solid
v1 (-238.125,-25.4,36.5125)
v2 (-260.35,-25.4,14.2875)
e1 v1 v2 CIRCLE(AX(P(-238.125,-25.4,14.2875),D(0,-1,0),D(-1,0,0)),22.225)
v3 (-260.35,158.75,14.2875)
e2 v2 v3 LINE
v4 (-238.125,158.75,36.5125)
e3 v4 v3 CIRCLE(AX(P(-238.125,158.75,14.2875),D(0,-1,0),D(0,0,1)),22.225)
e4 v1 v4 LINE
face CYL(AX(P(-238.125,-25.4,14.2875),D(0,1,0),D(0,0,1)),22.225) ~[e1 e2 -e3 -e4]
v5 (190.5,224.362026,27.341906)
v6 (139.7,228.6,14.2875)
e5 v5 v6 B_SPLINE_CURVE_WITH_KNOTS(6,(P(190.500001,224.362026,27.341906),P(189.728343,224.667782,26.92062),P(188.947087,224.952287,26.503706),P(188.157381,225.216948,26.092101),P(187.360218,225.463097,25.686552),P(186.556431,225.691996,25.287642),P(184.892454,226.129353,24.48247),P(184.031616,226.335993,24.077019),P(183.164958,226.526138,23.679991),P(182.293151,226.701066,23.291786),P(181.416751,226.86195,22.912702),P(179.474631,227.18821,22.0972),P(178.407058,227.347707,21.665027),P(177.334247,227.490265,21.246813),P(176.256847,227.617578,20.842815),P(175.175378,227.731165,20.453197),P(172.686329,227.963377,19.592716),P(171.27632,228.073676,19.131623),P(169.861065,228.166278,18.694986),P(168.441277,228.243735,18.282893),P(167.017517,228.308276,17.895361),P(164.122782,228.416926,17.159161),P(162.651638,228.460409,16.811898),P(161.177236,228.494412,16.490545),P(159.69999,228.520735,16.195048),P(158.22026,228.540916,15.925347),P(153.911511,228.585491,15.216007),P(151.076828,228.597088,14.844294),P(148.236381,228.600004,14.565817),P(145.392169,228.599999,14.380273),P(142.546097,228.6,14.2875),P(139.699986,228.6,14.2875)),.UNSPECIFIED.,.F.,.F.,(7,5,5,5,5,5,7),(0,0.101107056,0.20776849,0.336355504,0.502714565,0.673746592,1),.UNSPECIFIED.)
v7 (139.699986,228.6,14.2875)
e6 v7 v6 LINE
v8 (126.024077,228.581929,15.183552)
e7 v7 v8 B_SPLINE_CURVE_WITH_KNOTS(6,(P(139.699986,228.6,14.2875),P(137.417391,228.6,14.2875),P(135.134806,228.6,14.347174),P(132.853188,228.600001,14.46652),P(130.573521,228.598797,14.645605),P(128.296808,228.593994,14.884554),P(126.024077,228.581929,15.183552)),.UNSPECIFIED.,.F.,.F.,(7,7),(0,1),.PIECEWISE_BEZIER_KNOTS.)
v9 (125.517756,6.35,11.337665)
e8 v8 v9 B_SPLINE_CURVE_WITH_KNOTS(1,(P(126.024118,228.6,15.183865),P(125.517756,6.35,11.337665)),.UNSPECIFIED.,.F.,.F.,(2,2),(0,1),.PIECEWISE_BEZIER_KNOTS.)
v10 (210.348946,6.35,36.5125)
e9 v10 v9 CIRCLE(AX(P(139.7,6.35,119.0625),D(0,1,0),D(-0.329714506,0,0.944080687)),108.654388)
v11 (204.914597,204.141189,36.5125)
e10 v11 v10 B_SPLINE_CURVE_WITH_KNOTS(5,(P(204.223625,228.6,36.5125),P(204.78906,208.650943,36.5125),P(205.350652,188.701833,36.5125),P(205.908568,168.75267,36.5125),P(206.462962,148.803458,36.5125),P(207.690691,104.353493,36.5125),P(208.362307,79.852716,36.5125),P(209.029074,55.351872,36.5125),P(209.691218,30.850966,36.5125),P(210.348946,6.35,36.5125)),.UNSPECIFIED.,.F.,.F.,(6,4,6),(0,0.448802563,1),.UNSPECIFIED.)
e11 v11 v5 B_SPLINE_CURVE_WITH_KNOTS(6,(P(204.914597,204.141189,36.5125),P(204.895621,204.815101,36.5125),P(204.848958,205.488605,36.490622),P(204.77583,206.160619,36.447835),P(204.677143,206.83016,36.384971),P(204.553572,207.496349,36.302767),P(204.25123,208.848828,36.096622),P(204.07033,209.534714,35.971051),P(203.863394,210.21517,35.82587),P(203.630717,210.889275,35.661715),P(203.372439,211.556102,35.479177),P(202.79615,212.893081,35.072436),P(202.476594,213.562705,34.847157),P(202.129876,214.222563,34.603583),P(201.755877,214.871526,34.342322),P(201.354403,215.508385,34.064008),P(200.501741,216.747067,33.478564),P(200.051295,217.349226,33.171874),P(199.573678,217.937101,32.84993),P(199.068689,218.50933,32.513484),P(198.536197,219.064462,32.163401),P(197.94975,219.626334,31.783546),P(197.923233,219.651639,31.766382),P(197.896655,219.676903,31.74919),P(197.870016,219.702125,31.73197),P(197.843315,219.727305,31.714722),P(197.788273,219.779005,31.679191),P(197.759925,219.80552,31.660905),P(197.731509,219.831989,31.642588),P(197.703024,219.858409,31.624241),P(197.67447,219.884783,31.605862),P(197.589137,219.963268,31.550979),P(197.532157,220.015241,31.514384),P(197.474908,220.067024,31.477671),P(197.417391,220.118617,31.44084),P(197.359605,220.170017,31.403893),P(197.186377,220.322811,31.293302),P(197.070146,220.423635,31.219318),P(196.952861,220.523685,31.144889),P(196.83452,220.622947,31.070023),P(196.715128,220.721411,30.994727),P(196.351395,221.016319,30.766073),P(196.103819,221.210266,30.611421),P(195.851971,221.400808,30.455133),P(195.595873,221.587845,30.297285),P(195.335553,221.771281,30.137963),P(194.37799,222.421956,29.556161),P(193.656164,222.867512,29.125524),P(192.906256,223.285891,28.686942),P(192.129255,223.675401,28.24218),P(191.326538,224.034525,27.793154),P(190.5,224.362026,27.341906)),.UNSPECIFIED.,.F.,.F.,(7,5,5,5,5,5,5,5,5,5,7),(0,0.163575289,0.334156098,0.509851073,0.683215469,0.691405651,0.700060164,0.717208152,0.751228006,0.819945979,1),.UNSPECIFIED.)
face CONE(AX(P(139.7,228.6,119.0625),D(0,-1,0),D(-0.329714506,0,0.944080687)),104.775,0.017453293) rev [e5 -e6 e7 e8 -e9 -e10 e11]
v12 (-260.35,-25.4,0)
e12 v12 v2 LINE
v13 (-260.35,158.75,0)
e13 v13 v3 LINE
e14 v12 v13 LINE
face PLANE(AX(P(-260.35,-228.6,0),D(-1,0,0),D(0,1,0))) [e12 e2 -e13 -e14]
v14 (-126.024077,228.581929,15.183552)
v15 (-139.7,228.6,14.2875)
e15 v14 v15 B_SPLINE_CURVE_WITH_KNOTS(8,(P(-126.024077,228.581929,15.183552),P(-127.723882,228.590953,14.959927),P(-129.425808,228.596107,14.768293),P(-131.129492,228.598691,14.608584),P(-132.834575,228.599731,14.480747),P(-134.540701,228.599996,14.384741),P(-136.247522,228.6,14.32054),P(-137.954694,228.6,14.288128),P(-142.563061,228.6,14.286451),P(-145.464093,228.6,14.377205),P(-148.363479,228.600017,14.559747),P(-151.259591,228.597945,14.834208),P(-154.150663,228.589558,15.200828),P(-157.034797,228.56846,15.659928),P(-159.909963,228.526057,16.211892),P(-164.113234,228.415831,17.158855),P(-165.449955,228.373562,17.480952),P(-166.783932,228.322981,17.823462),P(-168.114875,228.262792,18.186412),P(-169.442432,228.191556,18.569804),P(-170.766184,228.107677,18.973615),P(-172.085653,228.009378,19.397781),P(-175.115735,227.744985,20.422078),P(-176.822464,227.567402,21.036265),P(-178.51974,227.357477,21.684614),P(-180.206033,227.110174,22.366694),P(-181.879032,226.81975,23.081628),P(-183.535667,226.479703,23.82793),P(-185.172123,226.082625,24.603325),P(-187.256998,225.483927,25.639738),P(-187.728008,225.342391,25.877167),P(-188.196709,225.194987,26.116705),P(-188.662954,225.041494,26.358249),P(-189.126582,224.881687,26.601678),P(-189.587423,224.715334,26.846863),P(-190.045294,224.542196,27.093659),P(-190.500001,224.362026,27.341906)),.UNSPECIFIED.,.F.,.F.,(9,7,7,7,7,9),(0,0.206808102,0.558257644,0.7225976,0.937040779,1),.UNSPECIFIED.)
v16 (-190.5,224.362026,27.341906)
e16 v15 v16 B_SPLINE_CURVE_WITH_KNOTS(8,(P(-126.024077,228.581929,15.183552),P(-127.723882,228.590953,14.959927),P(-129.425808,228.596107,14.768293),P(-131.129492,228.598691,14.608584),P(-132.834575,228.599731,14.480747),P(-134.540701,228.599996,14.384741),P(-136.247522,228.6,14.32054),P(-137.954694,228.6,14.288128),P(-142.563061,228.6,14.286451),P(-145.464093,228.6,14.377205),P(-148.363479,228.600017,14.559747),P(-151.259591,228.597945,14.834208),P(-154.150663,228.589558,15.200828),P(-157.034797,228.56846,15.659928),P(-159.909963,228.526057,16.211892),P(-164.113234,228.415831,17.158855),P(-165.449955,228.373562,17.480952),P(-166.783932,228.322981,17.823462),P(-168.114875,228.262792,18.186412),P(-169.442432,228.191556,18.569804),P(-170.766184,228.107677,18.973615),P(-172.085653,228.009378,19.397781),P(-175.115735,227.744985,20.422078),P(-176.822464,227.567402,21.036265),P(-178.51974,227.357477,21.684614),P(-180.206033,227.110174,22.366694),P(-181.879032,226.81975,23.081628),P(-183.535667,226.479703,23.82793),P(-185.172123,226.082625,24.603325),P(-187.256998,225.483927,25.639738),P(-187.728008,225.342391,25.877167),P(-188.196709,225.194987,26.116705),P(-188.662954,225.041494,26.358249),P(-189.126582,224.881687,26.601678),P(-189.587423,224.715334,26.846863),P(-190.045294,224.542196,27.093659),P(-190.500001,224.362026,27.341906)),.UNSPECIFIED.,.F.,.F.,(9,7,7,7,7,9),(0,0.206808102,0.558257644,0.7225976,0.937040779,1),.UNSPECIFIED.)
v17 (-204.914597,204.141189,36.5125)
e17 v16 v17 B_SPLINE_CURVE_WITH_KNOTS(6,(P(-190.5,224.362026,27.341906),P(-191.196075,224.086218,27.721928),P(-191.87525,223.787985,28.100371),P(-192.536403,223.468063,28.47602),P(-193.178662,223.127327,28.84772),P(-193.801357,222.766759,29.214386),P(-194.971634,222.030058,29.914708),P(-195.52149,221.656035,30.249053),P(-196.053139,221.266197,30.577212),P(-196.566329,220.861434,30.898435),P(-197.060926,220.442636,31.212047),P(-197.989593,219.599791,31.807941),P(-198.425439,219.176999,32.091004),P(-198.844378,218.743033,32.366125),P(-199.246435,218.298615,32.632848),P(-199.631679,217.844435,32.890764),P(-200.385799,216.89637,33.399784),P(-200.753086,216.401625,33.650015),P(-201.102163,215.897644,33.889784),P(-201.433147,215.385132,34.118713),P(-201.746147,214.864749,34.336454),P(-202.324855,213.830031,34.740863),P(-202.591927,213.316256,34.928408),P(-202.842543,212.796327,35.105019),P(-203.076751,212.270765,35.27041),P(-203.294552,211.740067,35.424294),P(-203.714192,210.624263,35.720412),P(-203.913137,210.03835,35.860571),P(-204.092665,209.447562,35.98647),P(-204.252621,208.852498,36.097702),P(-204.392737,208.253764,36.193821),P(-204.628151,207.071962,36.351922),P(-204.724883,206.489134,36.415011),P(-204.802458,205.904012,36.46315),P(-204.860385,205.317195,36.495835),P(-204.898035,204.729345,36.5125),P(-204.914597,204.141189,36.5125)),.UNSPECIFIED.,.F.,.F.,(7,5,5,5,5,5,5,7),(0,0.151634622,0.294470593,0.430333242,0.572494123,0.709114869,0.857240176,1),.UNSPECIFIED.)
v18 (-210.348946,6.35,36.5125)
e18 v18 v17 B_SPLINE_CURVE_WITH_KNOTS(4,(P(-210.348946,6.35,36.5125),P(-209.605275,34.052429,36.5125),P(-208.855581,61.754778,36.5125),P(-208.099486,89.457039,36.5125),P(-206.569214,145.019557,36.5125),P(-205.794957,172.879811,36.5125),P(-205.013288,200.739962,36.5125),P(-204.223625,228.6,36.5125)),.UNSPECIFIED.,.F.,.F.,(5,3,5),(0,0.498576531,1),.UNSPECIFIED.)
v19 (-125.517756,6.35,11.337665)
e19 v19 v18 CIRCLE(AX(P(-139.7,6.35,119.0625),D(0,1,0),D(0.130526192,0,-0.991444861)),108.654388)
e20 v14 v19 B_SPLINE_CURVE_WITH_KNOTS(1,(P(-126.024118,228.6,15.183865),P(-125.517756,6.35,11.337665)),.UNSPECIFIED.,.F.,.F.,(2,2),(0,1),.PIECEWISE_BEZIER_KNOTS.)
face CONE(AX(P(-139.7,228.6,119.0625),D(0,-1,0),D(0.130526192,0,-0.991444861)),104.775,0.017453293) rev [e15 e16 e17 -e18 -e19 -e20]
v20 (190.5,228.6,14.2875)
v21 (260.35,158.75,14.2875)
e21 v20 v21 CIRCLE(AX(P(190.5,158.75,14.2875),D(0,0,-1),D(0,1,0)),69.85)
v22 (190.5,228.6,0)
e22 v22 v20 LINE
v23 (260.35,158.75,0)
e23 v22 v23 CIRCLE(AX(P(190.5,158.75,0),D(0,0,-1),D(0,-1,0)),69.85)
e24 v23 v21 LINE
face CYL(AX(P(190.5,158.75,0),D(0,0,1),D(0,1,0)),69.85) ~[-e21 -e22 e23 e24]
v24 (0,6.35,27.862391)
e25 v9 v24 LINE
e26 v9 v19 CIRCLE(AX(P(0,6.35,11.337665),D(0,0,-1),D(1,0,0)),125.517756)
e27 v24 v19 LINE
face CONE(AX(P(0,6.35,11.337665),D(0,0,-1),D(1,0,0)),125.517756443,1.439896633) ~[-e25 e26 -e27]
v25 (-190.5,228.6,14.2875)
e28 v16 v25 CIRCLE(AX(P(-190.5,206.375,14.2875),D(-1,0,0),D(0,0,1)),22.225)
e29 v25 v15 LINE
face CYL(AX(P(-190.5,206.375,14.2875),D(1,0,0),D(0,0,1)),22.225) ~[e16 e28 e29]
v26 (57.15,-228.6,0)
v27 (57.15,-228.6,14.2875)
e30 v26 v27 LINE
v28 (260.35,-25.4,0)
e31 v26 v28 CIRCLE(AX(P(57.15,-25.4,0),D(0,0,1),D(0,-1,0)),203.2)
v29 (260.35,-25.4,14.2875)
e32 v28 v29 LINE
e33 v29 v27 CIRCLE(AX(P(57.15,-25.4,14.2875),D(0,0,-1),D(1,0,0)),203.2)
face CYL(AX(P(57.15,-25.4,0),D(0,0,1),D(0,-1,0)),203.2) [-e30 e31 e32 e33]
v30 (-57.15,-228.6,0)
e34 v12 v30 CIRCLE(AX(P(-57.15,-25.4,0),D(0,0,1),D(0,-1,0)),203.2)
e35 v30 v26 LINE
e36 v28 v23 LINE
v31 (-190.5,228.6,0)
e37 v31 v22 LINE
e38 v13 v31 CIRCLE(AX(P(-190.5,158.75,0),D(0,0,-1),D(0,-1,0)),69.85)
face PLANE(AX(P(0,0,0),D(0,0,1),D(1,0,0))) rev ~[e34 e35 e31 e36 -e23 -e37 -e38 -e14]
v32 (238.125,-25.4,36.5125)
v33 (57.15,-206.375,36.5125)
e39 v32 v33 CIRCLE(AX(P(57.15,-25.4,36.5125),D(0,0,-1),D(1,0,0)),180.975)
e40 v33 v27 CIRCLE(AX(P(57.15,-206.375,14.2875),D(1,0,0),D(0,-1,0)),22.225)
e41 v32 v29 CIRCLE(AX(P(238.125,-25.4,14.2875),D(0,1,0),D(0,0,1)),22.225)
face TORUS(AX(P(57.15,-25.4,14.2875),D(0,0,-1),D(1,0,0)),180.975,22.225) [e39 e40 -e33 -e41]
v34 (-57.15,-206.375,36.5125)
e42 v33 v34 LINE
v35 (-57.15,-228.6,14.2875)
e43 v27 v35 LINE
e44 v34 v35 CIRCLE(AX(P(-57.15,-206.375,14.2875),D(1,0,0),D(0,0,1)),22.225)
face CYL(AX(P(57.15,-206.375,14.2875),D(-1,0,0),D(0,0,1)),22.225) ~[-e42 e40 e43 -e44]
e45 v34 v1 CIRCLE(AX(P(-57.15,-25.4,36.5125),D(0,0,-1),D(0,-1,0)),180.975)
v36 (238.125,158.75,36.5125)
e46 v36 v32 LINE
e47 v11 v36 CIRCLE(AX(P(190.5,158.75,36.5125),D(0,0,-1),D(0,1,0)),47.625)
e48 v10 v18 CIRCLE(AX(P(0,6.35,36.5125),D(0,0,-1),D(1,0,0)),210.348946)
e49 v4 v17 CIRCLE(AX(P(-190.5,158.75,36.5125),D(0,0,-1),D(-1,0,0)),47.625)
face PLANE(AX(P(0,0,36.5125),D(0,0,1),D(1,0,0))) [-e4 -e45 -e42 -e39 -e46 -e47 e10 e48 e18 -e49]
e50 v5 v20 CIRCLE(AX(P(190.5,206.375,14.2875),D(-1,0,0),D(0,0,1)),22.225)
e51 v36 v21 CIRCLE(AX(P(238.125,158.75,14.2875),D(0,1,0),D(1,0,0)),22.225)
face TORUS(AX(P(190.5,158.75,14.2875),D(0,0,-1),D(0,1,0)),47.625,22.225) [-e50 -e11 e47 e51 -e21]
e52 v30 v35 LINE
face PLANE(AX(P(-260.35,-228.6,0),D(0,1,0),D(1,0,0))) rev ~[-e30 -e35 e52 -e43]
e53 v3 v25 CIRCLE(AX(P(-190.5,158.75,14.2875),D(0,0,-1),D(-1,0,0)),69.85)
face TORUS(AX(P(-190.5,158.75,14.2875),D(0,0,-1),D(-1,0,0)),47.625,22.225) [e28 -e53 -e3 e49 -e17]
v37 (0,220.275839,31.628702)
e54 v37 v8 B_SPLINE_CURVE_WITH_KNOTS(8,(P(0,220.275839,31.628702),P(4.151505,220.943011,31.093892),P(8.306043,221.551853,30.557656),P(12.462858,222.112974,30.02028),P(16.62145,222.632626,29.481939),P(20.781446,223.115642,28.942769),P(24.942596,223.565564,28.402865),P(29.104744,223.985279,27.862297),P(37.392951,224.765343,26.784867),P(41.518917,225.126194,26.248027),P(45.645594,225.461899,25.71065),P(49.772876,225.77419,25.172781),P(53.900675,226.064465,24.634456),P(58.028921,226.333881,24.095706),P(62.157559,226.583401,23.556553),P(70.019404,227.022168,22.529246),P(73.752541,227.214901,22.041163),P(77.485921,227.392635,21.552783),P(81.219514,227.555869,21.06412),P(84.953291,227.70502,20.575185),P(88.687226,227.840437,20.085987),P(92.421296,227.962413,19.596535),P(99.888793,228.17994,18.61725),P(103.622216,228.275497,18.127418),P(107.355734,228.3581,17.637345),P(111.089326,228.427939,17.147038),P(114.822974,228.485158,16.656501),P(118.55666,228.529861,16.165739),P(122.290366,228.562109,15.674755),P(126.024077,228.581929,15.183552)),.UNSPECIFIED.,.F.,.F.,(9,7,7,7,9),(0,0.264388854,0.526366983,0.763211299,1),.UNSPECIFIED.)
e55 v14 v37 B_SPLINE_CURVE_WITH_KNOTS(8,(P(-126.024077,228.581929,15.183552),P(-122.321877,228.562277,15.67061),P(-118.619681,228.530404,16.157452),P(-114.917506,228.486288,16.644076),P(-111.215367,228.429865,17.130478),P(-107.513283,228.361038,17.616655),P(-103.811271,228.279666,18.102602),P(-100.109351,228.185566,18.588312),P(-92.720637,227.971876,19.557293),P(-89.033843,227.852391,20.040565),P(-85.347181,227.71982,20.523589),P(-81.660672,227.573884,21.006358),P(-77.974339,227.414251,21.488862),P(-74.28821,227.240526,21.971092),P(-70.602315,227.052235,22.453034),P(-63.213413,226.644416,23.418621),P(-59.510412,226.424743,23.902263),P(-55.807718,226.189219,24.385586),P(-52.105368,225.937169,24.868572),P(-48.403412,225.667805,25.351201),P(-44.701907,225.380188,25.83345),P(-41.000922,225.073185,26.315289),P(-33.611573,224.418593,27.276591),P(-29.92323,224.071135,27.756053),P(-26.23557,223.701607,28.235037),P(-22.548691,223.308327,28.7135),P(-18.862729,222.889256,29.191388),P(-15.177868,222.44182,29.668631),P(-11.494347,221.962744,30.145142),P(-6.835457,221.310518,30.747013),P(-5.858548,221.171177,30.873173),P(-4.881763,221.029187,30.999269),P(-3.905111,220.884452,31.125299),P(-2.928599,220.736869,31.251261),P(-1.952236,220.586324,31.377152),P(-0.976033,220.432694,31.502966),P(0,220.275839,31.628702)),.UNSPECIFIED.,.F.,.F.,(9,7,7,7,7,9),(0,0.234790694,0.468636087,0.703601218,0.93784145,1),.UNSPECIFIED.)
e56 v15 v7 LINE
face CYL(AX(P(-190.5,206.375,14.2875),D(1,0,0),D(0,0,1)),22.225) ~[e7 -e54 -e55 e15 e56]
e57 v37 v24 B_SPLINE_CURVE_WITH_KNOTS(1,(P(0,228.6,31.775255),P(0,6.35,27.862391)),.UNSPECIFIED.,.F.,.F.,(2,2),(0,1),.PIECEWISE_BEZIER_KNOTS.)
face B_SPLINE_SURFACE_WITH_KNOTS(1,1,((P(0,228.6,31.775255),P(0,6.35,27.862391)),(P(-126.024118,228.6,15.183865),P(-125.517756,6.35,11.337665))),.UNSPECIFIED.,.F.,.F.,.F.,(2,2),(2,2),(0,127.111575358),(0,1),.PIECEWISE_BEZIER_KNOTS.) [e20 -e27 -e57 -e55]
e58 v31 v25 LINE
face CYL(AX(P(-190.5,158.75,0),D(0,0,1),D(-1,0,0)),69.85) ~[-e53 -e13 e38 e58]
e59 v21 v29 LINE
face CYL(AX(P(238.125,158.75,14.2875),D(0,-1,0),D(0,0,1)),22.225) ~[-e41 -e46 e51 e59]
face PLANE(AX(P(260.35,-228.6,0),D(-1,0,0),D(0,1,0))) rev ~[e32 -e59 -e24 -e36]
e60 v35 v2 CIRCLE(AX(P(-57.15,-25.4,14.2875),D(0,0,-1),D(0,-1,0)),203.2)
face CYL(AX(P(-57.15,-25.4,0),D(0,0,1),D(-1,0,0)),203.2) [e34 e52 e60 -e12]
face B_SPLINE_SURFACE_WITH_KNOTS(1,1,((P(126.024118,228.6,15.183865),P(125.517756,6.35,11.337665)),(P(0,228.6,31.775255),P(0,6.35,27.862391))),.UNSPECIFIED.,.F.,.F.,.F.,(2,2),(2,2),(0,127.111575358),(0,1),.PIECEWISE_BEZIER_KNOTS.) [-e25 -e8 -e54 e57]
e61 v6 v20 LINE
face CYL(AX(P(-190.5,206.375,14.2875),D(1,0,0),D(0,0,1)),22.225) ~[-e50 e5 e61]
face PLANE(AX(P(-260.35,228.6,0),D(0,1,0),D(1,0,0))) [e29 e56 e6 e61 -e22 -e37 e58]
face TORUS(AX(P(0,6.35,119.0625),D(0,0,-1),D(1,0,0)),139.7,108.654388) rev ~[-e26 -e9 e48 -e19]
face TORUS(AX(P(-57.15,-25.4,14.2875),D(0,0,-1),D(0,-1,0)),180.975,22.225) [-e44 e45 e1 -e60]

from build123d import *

# Parameters (mm, degrees)
F0_W     = 520.7
F0_H     = 457.2
F1_DEPTH = 36.5125
F2_R     = 203.2
F3_R     = 69.85
F4_R     = 22.225
F6_DEPTH = 222.25
F6_TAPER = -1
F8_ANGLE = 180


# Not quite as in the source:
# - a feature names something its author has since deleted; it is built from what else it names


with BuildPart() as f1:
    # F0 (on Top) → F1 (new body)
    with BuildSketch(Plane.XY):
        Rectangle(F0_W, F0_H)
    extrude(amount=F1_DEPTH)

    # F2
    f2_edges = [f1.edges().sort_by_distance(p)[0] for p in [
        (-260.35, -228.6, 18.25625),
        (260.35, -228.6, 18.25625),
    ]]
    fillet(f2_edges, radius=F2_R)

    # F3
    f3_edges = [f1.edges().sort_by_distance(p)[0] for p in [
        (260.35, 228.6, 18.25625),
        (-260.35, 228.6, 18.25625),
    ]]
    fillet(f3_edges, radius=F3_R)

    # F4
    f4_edges = [f1.edges().sort_by_distance(p)[0] for p in [
        (0, 228.6, 36.5125),
    ]]
    fillet(f4_edges, radius=F4_R)

    # F5 (on face) → F6 (cut)
    with BuildSketch(Plane(origin=(0, 228.6, 0), x_dir=(-1, 0, 0), z_dir=(0, 1, 0))):
        with BuildLine():
            Line((0, 181.2540946981), (-105.1541626057, 217.9785540242))
            ThreePointArc((-105.1541626057, 217.9785540242), (-243.9245415433, 129.7884295676), (-126.0241182101, 15.1838646496))
            Line((-126.0241182101, 15.1838646496), (0, 31.7752545682))
            Line((0, 31.7752545682), (126.0241182101, 15.1838646496))
            ThreePointArc((126.0241182101, 15.1838646496), (243.9245415433, 129.7884295676), (105.1541626057, 217.9785540242))
            Line((105.1541626057, 217.9785540242), (0, 181.2540946981))
        make_face()
    extrude(amount=-F6_DEPTH, taper=F6_TAPER, mode=Mode.SUBTRACT)

    # F7 (on face) → F8 (revolve, cut)
    with BuildSketch(Plane(origin=(0, 6.35, 0), x_dir=(-1, 0, 0), z_dir=(0, 1, 0))):
        with BuildLine():
            Line((0, 36.5125), (-210.3489459995, 36.5125))
            ThreePointArc((-210.3489459995, 36.5125), (-170.6122176221, 14.8981545045), (-125.5177564428, 11.3376651729))
            Line((-125.5177564428, 11.3376651729), (0, 27.8623913002))
            Line((0, 27.8623913002), (0, 36.5125))
        make_face()
    revolve(axis=Axis((0, 6.35, 32.1874456501), (0, 0, -1)), revolution_arc=F8_ANGLE, mode=Mode.SUBTRACT)


solid = f1.part
